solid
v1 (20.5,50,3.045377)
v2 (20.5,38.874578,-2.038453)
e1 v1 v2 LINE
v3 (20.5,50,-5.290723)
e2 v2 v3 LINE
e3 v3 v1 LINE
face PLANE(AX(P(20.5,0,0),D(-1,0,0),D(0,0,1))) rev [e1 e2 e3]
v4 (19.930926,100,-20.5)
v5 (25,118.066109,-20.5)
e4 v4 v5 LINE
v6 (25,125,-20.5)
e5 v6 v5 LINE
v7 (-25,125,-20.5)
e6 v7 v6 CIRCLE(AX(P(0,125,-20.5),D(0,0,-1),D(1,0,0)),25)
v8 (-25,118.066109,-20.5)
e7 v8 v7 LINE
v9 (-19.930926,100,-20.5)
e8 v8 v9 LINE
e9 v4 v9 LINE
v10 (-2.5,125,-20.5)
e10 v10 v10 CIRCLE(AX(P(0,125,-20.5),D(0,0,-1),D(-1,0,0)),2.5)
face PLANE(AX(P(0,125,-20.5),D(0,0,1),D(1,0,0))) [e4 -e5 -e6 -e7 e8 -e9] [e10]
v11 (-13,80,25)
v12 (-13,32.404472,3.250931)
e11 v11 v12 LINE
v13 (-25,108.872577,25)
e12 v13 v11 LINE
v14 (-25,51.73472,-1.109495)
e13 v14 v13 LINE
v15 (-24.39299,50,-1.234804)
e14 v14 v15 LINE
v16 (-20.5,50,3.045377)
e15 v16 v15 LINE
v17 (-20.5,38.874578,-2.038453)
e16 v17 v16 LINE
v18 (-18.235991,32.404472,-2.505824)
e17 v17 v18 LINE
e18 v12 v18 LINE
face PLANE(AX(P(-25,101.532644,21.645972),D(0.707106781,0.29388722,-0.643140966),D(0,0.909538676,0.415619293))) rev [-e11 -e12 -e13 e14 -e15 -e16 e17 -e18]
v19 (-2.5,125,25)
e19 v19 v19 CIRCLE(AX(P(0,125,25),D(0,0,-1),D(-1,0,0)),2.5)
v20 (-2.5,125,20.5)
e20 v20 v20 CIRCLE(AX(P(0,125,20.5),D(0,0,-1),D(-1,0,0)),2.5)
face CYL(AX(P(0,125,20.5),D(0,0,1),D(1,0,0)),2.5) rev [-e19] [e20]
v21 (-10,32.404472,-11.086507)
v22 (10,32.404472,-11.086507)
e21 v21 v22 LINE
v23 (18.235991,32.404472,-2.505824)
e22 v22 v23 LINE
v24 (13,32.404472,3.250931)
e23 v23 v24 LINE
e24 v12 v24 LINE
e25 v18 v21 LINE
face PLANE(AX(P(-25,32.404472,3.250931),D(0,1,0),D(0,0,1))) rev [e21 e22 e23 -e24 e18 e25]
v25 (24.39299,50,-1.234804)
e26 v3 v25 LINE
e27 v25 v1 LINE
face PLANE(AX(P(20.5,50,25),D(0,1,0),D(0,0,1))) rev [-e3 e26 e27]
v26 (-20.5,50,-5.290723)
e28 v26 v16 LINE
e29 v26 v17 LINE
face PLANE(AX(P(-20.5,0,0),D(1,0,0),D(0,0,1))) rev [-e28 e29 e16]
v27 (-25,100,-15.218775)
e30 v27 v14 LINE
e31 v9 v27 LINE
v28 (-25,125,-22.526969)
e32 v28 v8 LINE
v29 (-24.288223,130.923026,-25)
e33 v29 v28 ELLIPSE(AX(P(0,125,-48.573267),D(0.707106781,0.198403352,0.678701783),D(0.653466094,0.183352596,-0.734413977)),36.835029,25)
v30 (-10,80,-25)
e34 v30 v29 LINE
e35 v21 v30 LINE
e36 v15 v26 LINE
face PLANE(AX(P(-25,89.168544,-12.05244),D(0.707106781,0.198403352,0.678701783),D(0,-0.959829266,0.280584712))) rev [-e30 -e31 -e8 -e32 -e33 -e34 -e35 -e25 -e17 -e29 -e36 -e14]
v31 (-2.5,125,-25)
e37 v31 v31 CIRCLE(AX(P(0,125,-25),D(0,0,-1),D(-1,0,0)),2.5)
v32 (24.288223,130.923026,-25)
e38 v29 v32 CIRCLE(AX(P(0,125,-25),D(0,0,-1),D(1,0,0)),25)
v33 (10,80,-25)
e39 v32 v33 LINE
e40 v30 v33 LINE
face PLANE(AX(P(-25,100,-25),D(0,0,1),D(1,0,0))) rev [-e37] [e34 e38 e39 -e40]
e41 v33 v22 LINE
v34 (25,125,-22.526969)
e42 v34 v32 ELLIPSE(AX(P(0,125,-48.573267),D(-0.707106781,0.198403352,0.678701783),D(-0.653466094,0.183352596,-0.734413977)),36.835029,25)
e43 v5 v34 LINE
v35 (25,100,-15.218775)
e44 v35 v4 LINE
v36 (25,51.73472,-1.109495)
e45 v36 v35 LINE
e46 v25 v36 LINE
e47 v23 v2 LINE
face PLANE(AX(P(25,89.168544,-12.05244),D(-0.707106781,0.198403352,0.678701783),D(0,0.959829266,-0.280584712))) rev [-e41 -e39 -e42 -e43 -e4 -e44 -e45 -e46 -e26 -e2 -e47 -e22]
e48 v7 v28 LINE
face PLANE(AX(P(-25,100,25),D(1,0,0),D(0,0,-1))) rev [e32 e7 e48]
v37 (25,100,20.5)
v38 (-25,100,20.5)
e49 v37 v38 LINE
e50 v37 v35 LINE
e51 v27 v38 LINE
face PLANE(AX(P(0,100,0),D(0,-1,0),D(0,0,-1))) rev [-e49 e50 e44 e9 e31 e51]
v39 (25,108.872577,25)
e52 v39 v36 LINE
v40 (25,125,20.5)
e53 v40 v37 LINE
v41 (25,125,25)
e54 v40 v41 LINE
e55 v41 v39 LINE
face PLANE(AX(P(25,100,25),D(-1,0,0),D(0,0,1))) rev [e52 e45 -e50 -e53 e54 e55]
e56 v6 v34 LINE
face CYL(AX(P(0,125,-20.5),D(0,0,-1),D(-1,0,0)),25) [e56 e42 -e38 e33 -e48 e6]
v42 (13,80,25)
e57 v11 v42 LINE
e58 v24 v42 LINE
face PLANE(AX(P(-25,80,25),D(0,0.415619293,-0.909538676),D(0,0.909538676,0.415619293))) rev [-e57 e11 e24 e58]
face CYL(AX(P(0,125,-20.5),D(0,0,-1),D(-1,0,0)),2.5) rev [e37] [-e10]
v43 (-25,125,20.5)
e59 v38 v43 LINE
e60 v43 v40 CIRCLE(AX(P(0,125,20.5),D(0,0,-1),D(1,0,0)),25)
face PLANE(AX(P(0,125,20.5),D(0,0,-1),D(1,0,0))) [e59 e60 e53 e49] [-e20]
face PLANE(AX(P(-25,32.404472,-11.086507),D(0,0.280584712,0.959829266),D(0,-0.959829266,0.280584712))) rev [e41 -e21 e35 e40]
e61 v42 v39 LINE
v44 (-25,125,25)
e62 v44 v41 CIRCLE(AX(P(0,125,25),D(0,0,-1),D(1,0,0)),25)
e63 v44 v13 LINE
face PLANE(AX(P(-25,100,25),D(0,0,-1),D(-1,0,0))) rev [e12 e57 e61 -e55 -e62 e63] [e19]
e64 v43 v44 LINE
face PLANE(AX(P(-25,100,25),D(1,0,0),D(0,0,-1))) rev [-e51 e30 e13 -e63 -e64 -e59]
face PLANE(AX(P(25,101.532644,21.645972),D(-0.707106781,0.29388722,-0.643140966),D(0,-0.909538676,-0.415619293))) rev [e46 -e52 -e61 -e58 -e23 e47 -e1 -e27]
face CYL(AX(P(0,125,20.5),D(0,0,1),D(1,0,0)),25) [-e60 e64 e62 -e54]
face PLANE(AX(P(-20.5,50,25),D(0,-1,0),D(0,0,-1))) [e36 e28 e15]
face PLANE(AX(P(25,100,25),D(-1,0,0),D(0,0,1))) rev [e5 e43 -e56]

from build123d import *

# Parameters (mm, degrees)
SKETCH1_W               = 50
SKETCH1_H               = 50
BOSS_EXTRUDE1_DEPTH     = 100
SKETCH4_R               = 2.5
BOSS_EXTRUDE2_DEPTH     = 4.5
CUT_EXTRUDE1_DEPTH      = 161.078105936
CUT_EXTRUDE1_DEPTH_BACK = 161.078105936
SKETCH5_R               = 2.5
SKETCH6_W               = 50
SKETCH6_H               = 50
CUT_EXTRUDE2_DEPTH      = 4.5
CUT_EXTRUDE5_DEPTH      = 161.078105936
CUT_EXTRUDE5_DEPTH_BACK = 161.078105936
CHAMFER1_SIZE           = 12


with BuildPart() as part:
    # Sketch1 → Boss-Extrude1 (new body)
    with BuildSketch(Plane(origin=(0, 0, 0), x_dir=(1, 0, 0), z_dir=(0, 1, 0))):
        Rectangle(SKETCH1_W, SKETCH1_H)
    extrude(amount=BOSS_EXTRUDE1_DEPTH)

    # Sketch4 → Boss-Extrude2 (add)
    with BuildSketch(Plane(origin=(0, 0, -25), x_dir=(-1, 0, 0), z_dir=(0, 0, -1))):
        with BuildLine():
            Line((-25, 100), (25, 100))
            Line((25, 100), (25, 125))
            ThreePointArc((25, 125), (0, 150), (-25, 125))
            Line((-25, 125), (-25, 100))
        make_face()
        with Locations((0, 125)):
            Circle(SKETCH4_R, mode=Mode.SUBTRACT)
    boss_extrude2 = extrude(amount=-BOSS_EXTRUDE2_DEPTH)

    # Mirror2: Boss-Extrude2 across plane
    add(boss_extrude2.mirror(Plane.XY))

    # Sketch5 → Cut-Extrude1 (cut, two sides: drawn at the far end of the back side and taken through both)
    with BuildSketch(Plane.ZY.offset(-25).offset(-CUT_EXTRUDE1_DEPTH_BACK)):
        with BuildLine():
            Line((-25, 0), (2.6e-08, 0))
            ThreePointArc((2.6e-08, 0), (-17.67766952, 7.322330461), (-25, 25))
            Line((-25, 25), (-25, 0))
        make_face()
        with BuildLine():
            Line((25, 0), (25, 25))
            ThreePointArc((25, 25), (17.677669539, 7.32233048), (2.6e-08, 0))
            Line((2.6e-08, 0), (25, 0))
        make_face()
        with Locations((0, 25)):
            Circle(SKETCH5_R)
    extrude(amount=CUT_EXTRUDE1_DEPTH + CUT_EXTRUDE1_DEPTH_BACK, mode=Mode.SUBTRACT)

    # Sketch6 → Cut-Extrude2 (cut)
    with BuildSketch(Plane(origin=(25, 0, 0), x_dir=(0, 0, -1), z_dir=(1, 0, 0))):
        with Locations((0, 25)):
            Rectangle(SKETCH6_W, SKETCH6_H)
    cut_extrude2 = extrude(amount=-CUT_EXTRUDE2_DEPTH, mode=Mode.SUBTRACT)

    # Mirror3: Cut-Extrude2 across plane
    add(cut_extrude2.mirror(Plane(origin=(0, 0, 0), x_dir=(0, 0, 1), z_dir=(1, 0, 0))), mode=Mode.SUBTRACT)

    # Sketch8 → Cut-Extrude5 (cut, two sides: drawn at the far end of the back side and taken through both)
    with BuildSketch(Plane(origin=(25, 0, 0), x_dir=(0, 0, -1), z_dir=(1, 0, 0)).offset(-CUT_EXTRUDE5_DEPTH_BACK)):
        Polygon((-25, 80), (-3.250930707, 32.404472018), (11.086507283, 32.404472018), (25, 80), (47.596959839, 33.904901575), (18.755369464, -23.278135991), (-42.095384797, 0), align=None)
    extrude(amount=CUT_EXTRUDE5_DEPTH + CUT_EXTRUDE5_DEPTH_BACK, mode=Mode.SUBTRACT)

    # Chamfer1
    chamfer1_edges = [part.edges().sort_by_distance(p)[0] for p in [
        (25, 65, 18.145657728),
        (-25, 65, 18.145657728),
    ]]
    chamfer(chamfer1_edges, length=CHAMFER1_SIZE)

    # Chamfer2
    # the kernel refuses this chamfer: 15 mm, written as the material it takes off along each edge
    with BuildSketch(Plane(origin=(25, -38.861557394, 9.746529416), x_dir=(0.02749587661058632, 0.2804786274156753, 0.9594663706104734), z_dir=(0, 0.9598292658239239, -0.2805847117501368)), Plane(origin=(-25, 168.861557394, -50.976697476), x_dir=(-0.027495876610586306, 0.2804786274156753, 0.9594663706104732), z_dir=(0, -0.9598292658239239, 0.2805847117501368))) as chamfer2_piece_1:
        with BuildLine():
            Line((15.430097928, 0), (-0.848207323, -15.406766903))
            Line((-0.848207323, -15.406766903), (-1.148093898, -15.39851814))
            ThreePointArc((-1.148093898, -15.39851814), (-0.511938406, -7.700967445), (-0.299886575, 0.008248763))
            Line((-0.299886575, 0.008248763), (0.008248763, 0.299886575))
            ThreePointArc((0.008248763, 0.299886575), (7.717464971, 0.087834744), (15.438346691, 0.299886575))
            Line((15.438346691, 0.299886575), (15.430097928, 0))
        make_face()
    extrude(amount=216.416733875, mode=Mode.SUBTRACT)


solid = part.part
